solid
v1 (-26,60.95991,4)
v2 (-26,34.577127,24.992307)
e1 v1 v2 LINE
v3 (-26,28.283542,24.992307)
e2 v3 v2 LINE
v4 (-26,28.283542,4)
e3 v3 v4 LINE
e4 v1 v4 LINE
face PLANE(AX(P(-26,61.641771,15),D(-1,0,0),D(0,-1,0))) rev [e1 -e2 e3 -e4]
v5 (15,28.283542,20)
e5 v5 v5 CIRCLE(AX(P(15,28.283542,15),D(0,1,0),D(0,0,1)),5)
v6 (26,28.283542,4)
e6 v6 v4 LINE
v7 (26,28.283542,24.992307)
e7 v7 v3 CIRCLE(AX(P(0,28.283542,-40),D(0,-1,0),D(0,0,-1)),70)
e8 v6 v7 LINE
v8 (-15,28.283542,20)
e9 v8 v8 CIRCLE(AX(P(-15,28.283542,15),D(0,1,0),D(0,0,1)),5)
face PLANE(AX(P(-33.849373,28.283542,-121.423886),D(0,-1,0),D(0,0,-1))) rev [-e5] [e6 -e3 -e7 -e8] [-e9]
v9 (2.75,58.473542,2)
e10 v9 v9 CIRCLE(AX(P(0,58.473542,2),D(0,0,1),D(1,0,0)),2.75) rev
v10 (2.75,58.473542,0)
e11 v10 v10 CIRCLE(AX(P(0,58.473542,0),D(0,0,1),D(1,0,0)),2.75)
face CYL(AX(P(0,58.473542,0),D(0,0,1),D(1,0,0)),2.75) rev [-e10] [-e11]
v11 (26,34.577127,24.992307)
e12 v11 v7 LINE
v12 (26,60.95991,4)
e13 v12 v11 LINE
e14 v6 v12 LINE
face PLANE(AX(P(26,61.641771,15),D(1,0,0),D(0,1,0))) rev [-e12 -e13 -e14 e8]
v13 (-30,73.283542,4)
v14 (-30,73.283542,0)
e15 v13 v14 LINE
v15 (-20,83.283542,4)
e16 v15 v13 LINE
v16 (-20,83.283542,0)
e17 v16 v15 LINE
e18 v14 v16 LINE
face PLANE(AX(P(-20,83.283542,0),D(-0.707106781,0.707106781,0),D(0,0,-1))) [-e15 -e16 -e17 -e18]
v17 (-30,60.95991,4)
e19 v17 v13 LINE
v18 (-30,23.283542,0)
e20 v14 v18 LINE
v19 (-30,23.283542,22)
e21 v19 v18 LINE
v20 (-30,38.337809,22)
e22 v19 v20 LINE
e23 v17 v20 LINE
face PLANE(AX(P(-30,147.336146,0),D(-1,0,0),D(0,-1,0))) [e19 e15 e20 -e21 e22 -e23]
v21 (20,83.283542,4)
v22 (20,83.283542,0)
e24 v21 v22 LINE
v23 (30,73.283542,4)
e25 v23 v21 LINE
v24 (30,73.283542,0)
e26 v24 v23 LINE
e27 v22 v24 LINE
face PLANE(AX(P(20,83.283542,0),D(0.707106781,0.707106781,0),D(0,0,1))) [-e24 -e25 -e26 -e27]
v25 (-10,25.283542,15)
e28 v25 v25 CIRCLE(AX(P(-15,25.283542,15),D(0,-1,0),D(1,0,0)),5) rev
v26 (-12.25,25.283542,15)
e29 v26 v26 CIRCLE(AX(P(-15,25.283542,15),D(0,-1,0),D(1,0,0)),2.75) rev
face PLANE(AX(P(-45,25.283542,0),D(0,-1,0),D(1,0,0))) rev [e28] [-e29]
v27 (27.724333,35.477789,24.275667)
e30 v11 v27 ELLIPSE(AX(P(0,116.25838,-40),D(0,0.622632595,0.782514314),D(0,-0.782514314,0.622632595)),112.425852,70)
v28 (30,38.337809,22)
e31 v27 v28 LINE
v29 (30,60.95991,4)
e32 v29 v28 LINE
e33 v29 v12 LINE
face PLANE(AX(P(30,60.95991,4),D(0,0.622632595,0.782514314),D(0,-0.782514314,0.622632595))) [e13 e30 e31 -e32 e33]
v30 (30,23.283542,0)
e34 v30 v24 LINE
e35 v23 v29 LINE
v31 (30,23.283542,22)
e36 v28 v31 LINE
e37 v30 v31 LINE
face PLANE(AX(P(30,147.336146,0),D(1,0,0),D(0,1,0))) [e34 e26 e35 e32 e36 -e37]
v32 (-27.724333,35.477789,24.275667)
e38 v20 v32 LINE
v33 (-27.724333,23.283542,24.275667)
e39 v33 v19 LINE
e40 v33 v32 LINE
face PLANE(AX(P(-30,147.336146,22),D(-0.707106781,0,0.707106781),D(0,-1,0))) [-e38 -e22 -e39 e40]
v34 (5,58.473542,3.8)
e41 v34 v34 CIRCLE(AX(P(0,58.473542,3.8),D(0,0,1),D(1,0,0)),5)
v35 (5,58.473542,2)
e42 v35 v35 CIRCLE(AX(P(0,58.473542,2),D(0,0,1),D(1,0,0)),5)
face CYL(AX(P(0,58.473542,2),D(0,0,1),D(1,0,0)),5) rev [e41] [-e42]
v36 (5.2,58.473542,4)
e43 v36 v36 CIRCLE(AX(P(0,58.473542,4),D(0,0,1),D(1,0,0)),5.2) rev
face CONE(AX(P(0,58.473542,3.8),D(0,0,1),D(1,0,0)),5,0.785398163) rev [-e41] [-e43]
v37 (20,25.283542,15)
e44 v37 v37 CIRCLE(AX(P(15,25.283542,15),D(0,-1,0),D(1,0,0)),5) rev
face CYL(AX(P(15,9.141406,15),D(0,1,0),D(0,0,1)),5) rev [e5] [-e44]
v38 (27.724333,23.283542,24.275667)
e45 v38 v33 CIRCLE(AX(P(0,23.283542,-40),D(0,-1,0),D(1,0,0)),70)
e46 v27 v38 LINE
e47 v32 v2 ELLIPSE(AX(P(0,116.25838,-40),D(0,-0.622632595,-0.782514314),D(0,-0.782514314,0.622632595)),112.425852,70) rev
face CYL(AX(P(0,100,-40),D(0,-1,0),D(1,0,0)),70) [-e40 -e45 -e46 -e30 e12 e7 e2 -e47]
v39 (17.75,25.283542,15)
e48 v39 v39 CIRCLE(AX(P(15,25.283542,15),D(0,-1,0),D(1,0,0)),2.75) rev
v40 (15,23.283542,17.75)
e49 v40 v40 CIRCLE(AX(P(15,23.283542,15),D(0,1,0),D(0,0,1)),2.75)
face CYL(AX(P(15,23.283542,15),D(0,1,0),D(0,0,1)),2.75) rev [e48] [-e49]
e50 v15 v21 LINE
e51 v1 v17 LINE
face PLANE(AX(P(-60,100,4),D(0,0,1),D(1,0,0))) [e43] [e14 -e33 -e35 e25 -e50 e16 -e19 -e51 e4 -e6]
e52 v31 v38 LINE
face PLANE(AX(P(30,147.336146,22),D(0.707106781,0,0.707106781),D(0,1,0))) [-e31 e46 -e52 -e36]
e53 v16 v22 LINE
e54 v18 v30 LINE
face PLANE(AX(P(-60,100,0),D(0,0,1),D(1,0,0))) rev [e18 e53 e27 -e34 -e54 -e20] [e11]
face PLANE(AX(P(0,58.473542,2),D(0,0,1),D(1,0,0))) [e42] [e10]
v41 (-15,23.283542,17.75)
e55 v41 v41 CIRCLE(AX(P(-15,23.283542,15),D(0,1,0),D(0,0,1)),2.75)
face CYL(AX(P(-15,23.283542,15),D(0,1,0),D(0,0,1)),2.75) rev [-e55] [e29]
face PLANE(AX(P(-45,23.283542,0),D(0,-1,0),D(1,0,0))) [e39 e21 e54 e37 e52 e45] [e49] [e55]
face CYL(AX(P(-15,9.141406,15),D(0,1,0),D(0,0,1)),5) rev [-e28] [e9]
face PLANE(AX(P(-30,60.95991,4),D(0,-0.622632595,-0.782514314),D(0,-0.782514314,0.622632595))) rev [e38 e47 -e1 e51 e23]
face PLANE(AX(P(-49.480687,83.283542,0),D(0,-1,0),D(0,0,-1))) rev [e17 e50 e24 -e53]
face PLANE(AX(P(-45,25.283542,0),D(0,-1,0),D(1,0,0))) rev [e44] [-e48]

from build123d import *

# Parameters (mm, degrees)
SKETCH1_W                = 120
SKETCH1_H                = 30
BOSS_EXTRUDE1_DEPTH      = 100
CUT_EXTRUDE1_DEPTH       = 121.415945788
CUT_EXTRUDE1_DEPTH_BACK  = 121.415945788
SKETCH2_R                = 2.15
SKETCH2_W                = 20.1
SKETCH2_H                = 40.4
SKETCH3_OUTSIDE_W        = 153.812
SKETCH3_OUTSIDE_H        = 133.812
CUT_EXTRUDE2_DEPTH       = 121.415945788
CUT_EXTRUDE3_START       = -30
CUT_EXTRUDE3_DEPTH       = 30
SKETCH5_W                = 67.698745078
SKETCH5_H                = 100.8
CUT_EXTRUDE4_DEPTH       = 26
RIB1_REACH               = 122.416
SKETCH6_WALL_W           = 284.590065176
SKETCH6_WALL_H           = 4
RIB6_REACH               = 122.416
SKETCH7_WALL_W           = 284.590065176
SKETCH7_WALL_H           = 4
BOSS_EXTRUDE2_DEPTH      = 5
BOSS_EXTRUDE2_DEPTH_BACK = 4
SKETCH8_R                = 2.15
CUT_EXTRUDE5_DEPTH       = 84.326168543
CUT_EXTRUDE5_DEPTH_BACK  = 84.326168543
SKETCH9_R                = 2.75
SKETCH10_R               = 5
CUT_EXTRUDE6_DEPTH       = 3
CHAMFER1_SIZE            = 8
CUT_EXTRUDE7_START       = -12.194246874
CUT_EXTRUDE7_DEPTH       = 12.194246874
SKETCH12_W               = 37.282730079
SKETCH12_H               = 58.292887361
CUT_EXTRUDE8_DEPTH       = 108.591821251
SKETCH13_W               = 20.1
SKETCH13_H               = 40.4
BOSS_EXTRUDE3_DEPTH      = 4
SKETCH16_W               = 60
SKETCH16_H               = 40
BOSS_EXTRUDE4_DEPTH      = 4
CUT_EXTRUDE9_DEPTH       = 109.484577329
CUT_EXTRUDE9_DEPTH_BACK  = 109.484577329
SKETCH14_R               = 2.75
SKETCH15_R               = 5
CUT_EXTRUDE10_DEPTH      = 2
CHAMFER2_SIZE            = 0.2
CHAMFER3_SIZE            = 10
CUT_EXTRUDE11_DEPTH      = 109.484577329
CUT_EXTRUDE11_DEPTH_BACK = 109.484577329
CHAMFER4_SIZE            = 10


# Read off the part's stored shape, not the designer's step: Cut-Extrude3, Cut-Extrude7
with BuildPart() as part:
    # Sketch1 → Boss-Extrude1 (new body)
    with BuildSketch(Plane(origin=(0, 0, 0), x_dir=(1, 0, 0), z_dir=(0, 1, 0))):
        with Locations((0, -15)):
            Rectangle(SKETCH1_W, SKETCH1_H)
    extrude(amount=BOSS_EXTRUDE1_DEPTH)

    # Sketch2 → Cut-Extrude1 (cut, two sides: drawn at the far end of the back side and taken through both)
    with BuildSketch(Plane.XY.offset(30).offset(-CUT_EXTRUDE1_DEPTH_BACK)):
        with Locations((-4.95, 82.583541889)):
            Circle(SKETCH2_R)
        with Locations((4.95, 82.583541889)):
            Circle(SKETCH2_R)
        with Locations((-4.95, 34.383541889)):
            Circle(SKETCH2_R)
        with Locations((4.95, 34.383541889)):
            Circle(SKETCH2_R)
        with Locations((0, 58.483541889)):
            Rectangle(SKETCH2_W, SKETCH2_H)
    extrude(amount=CUT_EXTRUDE1_DEPTH + CUT_EXTRUDE1_DEPTH_BACK, mode=Mode.SUBTRACT)

    # Sketch3 outside → Cut-Extrude2 (cut, through all)
    with BuildSketch(Plane.XY.offset(30)):
        with Locations((0, 50)):
            Rectangle(SKETCH3_OUTSIDE_W, SKETCH3_OUTSIDE_H)
        with BuildLine():
            Line((-45, 23.283541889), (45, 23.283541889))
            Line((45, 23.283541889), (19.804596008, 86.568297014))
            ThreePointArc((19.804596008, 86.568297014), (0, 100), (-19.804596008, 86.568297014))
            Line((-19.804596008, 86.568297014), (-45, 23.283541889))
        make_face(mode=Mode.SUBTRACT)
    extrude(amount=-CUT_EXTRUDE2_DEPTH, mode=Mode.SUBTRACT)

    # Cut-Extrude3 outline → Cut-Extrude3 (cut)
    with BuildSketch(Plane.XY.offset(30).offset(CUT_EXTRUDE3_START)):
        Polygon((30, 60.95991045), (30, 23.283541889), (45, 23.283541889), align=None)
        Polygon((-30, 23.283541889), (-30, 60.95991045), (-45, 23.283541889), align=None)
    extrude(amount=CUT_EXTRUDE3_DEPTH, mode=Mode.SUBTRACT)

    # Sketch5 → Cut-Extrude4 (cut)
    with BuildSketch(Plane.XY.offset(30)):
        with Locations((0, 78.683541889)):
            Rectangle(SKETCH5_W, SKETCH5_H)
    extrude(amount=-CUT_EXTRUDE4_DEPTH, mode=Mode.SUBTRACT)

    # Sketch6 wall → Rib1 (add, up to next)
    with BuildSketch(Plane(origin=(-30, 44.62172617, 17), x_dir=(0, -0.782514313837, 0.622632595228), z_dir=(0, 0.622632595228, 0.782514313837)), mode=Mode.PRIVATE) as rib1_sk1:
        with Locations((0, 2)):
            Rectangle(SKETCH6_WALL_W, SKETCH6_WALL_H)
    rib1_tool1 = extrude(rib1_sk1.sketch, amount=-RIB1_REACH, mode=Mode.PRIVATE) - part.part
    add(rib1_tool1.solids().sort_by_distance((-30, 44.62172617, 17))[0])

    # Sketch7 wall → Rib6 (add, up to next)
    with BuildSketch(Plane(origin=(30, 44.62172617, 17), x_dir=(0, -0.782514313837, 0.622632595228), z_dir=(0, -0.622632595228, -0.782514313837)), mode=Mode.PRIVATE) as rib6_sk1:
        with Locations((0, 2)):
            Rectangle(SKETCH7_WALL_W, SKETCH7_WALL_H)
    rib6_tool1 = extrude(rib6_sk1.sketch, amount=RIB6_REACH, mode=Mode.PRIVATE) - part.part
    add(rib6_tool1.solids().sort_by_distance((30, 44.62172617, 17))[0])

    # Sketch8 → Boss-Extrude2 (add, two sides: drawn at the far end of the back side and taken through both)
    with BuildSketch(Plane.XY.offset(4).offset(-BOSS_EXTRUDE2_DEPTH_BACK)):
        with Locations((-4.95, 82.583541889)):
            Circle(SKETCH8_R)
        with Locations((4.95, 82.583541889)):
            Circle(SKETCH8_R)
        with Locations((-4.95, 34.383541889)):
            Circle(SKETCH8_R)
        with Locations((4.95, 34.383541889)):
            Circle(SKETCH8_R)
    extrude(amount=BOSS_EXTRUDE2_DEPTH + BOSS_EXTRUDE2_DEPTH_BACK)

    # Sketch9 → Cut-Extrude5 (cut, two sides: drawn at the far end of the back side and taken through both)
    with BuildSketch(Plane(origin=(0, 28.283541889, 0), x_dir=(1, 0, 0), z_dir=(0, 1, 0)).offset(-CUT_EXTRUDE5_DEPTH_BACK)):
        with Locations(Location((-15, -15, 0), (0, 0, 270))):
            Circle(SKETCH9_R)
        with Locations(Location((15, -15, 0), (0, 0, 270))):
            Circle(SKETCH9_R)
    extrude(amount=CUT_EXTRUDE5_DEPTH + CUT_EXTRUDE5_DEPTH_BACK, mode=Mode.SUBTRACT)

    # Sketch10 → Cut-Extrude6 (cut)
    with BuildSketch(Plane(origin=(0, 28.283541889, 0), x_dir=(1, 0, 0), z_dir=(0, 1, 0))):
        with Locations(Location((-15, -15, 0), (0, 0, 270))):
            Circle(SKETCH10_R)
        with Locations(Location((15, -15, 0), (0, 0, 270))):
            Circle(SKETCH10_R)
    extrude(amount=-CUT_EXTRUDE6_DEPTH, mode=Mode.SUBTRACT)

    # Chamfer1
    # the kernel refuses this chamfer: 8 mm, written as the material it takes off along each edge
    with BuildSketch(Plane(origin=(-30, 2.710077985, 30), x_dir=(-0.02749587661058658, 0, -0.9996219169112968), z_dir=(0, 1, 0))) as chamfer1_piece_1:
        Polygon((CHAMFER1_SIZE * 0.999621916911, -CHAMFER1_SIZE * 0.0274958766106), (-CHAMFER1_SIZE * 0.0274958766106, -CHAMFER1_SIZE * 0.999621916911), (0, 0), align=None)
    extrude(amount=46.146927807, mode=Mode.SUBTRACT)
    with BuildSketch(Plane(origin=(30, 48.857005793, 30), x_dir=(-0.9996219169112968, 0, 0.027495876610586487), z_dir=(0, -1, 0))) as chamfer1_piece_2:
        Polygon((CHAMFER1_SIZE * 0.999621916911, CHAMFER1_SIZE * 0.0274958766106), (-CHAMFER1_SIZE * 0.0274958766106, CHAMFER1_SIZE * 0.999621916911), (0, 0), align=None)
    extrude(amount=46.146927807, mode=Mode.SUBTRACT)

    # Cut-Extrude7 outline → Cut-Extrude7 (cut)
    with BuildSketch(Plane.XZ.offset(-23.283541889).offset(CUT_EXTRUDE7_START)):
        with BuildLine():
            ThreePointArc((-27.724333118, 24.275666882), (-14.154563191, 28.553981218), (0, 30))
            Line((0, 30), (-22, 30))
            Line((-22, 30), (-27.724333118, 24.275666882))
        make_face()
        with BuildLine():
            ThreePointArc((0, 30), (14.154563191, 28.553981218), (27.724333118, 24.275666882))
            Line((27.724333118, 24.275666882), (22, 30))
            Line((22, 30), (0, 30))
        make_face()
    extrude(amount=CUT_EXTRUDE7_DEPTH, mode=Mode.SUBTRACT)

    # Sketch12 → Cut-Extrude8 (cut, through all)
    with BuildSketch(Plane.XY.offset(4)):
        with Locations((-0.669441285, 59.375969669)):
            Rectangle(SKETCH12_W, SKETCH12_H)
    extrude(amount=CUT_EXTRUDE8_DEPTH, mode=Mode.SUBTRACT)

    # Sketch13 → Boss-Extrude3 (add)
    with BuildSketch(Plane.XY.offset(4)):
        with Locations((0, 58.483541889)):
            Rectangle(SKETCH13_W, SKETCH13_H)
    extrude(amount=-BOSS_EXTRUDE3_DEPTH)

    # Sketch16 → Boss-Extrude4 (add)
    with BuildSketch(Plane(origin=(0, 0, 0), x_dir=(-1, 0, 0), z_dir=(0, 0, -1))):
        with Locations((0, 80.95991045)):
            Rectangle(SKETCH16_W, SKETCH16_H)
    extrude(amount=-BOSS_EXTRUDE4_DEPTH)

    # Sketch14 → Cut-Extrude9 (cut, two sides: drawn at the far end of the back side and taken through both)
    with BuildSketch(Plane.XY.offset(4).offset(-CUT_EXTRUDE9_DEPTH_BACK)):
        with Locations((0, 58.473541889)):
            Circle(SKETCH14_R)
    extrude(amount=CUT_EXTRUDE9_DEPTH + CUT_EXTRUDE9_DEPTH_BACK, mode=Mode.SUBTRACT)

    # Sketch15 → Cut-Extrude10 (cut)
    with BuildSketch(Plane.XY.offset(4)):
        with Locations((0, 58.473541889)):
            Circle(SKETCH15_R)
    extrude(amount=-CUT_EXTRUDE10_DEPTH, mode=Mode.SUBTRACT)

    # Chamfer2
    chamfer2_edges = [part.edges().sort_by_distance(p)[0] for p in [
        (-5, 58.473541889, 4),
    ]]
    chamfer(chamfer2_edges, length=CHAMFER2_SIZE)

    # Chamfer3
    chamfer3_edges = [part.edges().sort_by_distance(p)[0] for p in [
        (30, 100.95991045, 2),
        (-30, 100.95991045, 2),
    ]]
    chamfer(chamfer3_edges, length=CHAMFER3_SIZE)

    # Sketch17 → Cut-Extrude11 (cut, two sides: drawn at the far end of the back side and taken through both)
    with BuildSketch(Plane.XY.offset(4).offset(-CUT_EXTRUDE11_DEPTH_BACK)):
        Polygon((-49.480687217, 83.283541889), (47.707933407, 83.283541889), (47.707933407, 123.775741613), (-59.194126739, 121.253008662), align=None)
    extrude(amount=CUT_EXTRUDE11_DEPTH + CUT_EXTRUDE11_DEPTH_BACK, mode=Mode.SUBTRACT)

    # Chamfer4
    chamfer4_edges = [part.edges().sort_by_distance(p)[0] for p in [
        (-30, 83.283541889, 2),
        (30, 83.283541889, 2),
    ]]
    chamfer(chamfer4_edges, length=CHAMFER4_SIZE)


solid = part.part
